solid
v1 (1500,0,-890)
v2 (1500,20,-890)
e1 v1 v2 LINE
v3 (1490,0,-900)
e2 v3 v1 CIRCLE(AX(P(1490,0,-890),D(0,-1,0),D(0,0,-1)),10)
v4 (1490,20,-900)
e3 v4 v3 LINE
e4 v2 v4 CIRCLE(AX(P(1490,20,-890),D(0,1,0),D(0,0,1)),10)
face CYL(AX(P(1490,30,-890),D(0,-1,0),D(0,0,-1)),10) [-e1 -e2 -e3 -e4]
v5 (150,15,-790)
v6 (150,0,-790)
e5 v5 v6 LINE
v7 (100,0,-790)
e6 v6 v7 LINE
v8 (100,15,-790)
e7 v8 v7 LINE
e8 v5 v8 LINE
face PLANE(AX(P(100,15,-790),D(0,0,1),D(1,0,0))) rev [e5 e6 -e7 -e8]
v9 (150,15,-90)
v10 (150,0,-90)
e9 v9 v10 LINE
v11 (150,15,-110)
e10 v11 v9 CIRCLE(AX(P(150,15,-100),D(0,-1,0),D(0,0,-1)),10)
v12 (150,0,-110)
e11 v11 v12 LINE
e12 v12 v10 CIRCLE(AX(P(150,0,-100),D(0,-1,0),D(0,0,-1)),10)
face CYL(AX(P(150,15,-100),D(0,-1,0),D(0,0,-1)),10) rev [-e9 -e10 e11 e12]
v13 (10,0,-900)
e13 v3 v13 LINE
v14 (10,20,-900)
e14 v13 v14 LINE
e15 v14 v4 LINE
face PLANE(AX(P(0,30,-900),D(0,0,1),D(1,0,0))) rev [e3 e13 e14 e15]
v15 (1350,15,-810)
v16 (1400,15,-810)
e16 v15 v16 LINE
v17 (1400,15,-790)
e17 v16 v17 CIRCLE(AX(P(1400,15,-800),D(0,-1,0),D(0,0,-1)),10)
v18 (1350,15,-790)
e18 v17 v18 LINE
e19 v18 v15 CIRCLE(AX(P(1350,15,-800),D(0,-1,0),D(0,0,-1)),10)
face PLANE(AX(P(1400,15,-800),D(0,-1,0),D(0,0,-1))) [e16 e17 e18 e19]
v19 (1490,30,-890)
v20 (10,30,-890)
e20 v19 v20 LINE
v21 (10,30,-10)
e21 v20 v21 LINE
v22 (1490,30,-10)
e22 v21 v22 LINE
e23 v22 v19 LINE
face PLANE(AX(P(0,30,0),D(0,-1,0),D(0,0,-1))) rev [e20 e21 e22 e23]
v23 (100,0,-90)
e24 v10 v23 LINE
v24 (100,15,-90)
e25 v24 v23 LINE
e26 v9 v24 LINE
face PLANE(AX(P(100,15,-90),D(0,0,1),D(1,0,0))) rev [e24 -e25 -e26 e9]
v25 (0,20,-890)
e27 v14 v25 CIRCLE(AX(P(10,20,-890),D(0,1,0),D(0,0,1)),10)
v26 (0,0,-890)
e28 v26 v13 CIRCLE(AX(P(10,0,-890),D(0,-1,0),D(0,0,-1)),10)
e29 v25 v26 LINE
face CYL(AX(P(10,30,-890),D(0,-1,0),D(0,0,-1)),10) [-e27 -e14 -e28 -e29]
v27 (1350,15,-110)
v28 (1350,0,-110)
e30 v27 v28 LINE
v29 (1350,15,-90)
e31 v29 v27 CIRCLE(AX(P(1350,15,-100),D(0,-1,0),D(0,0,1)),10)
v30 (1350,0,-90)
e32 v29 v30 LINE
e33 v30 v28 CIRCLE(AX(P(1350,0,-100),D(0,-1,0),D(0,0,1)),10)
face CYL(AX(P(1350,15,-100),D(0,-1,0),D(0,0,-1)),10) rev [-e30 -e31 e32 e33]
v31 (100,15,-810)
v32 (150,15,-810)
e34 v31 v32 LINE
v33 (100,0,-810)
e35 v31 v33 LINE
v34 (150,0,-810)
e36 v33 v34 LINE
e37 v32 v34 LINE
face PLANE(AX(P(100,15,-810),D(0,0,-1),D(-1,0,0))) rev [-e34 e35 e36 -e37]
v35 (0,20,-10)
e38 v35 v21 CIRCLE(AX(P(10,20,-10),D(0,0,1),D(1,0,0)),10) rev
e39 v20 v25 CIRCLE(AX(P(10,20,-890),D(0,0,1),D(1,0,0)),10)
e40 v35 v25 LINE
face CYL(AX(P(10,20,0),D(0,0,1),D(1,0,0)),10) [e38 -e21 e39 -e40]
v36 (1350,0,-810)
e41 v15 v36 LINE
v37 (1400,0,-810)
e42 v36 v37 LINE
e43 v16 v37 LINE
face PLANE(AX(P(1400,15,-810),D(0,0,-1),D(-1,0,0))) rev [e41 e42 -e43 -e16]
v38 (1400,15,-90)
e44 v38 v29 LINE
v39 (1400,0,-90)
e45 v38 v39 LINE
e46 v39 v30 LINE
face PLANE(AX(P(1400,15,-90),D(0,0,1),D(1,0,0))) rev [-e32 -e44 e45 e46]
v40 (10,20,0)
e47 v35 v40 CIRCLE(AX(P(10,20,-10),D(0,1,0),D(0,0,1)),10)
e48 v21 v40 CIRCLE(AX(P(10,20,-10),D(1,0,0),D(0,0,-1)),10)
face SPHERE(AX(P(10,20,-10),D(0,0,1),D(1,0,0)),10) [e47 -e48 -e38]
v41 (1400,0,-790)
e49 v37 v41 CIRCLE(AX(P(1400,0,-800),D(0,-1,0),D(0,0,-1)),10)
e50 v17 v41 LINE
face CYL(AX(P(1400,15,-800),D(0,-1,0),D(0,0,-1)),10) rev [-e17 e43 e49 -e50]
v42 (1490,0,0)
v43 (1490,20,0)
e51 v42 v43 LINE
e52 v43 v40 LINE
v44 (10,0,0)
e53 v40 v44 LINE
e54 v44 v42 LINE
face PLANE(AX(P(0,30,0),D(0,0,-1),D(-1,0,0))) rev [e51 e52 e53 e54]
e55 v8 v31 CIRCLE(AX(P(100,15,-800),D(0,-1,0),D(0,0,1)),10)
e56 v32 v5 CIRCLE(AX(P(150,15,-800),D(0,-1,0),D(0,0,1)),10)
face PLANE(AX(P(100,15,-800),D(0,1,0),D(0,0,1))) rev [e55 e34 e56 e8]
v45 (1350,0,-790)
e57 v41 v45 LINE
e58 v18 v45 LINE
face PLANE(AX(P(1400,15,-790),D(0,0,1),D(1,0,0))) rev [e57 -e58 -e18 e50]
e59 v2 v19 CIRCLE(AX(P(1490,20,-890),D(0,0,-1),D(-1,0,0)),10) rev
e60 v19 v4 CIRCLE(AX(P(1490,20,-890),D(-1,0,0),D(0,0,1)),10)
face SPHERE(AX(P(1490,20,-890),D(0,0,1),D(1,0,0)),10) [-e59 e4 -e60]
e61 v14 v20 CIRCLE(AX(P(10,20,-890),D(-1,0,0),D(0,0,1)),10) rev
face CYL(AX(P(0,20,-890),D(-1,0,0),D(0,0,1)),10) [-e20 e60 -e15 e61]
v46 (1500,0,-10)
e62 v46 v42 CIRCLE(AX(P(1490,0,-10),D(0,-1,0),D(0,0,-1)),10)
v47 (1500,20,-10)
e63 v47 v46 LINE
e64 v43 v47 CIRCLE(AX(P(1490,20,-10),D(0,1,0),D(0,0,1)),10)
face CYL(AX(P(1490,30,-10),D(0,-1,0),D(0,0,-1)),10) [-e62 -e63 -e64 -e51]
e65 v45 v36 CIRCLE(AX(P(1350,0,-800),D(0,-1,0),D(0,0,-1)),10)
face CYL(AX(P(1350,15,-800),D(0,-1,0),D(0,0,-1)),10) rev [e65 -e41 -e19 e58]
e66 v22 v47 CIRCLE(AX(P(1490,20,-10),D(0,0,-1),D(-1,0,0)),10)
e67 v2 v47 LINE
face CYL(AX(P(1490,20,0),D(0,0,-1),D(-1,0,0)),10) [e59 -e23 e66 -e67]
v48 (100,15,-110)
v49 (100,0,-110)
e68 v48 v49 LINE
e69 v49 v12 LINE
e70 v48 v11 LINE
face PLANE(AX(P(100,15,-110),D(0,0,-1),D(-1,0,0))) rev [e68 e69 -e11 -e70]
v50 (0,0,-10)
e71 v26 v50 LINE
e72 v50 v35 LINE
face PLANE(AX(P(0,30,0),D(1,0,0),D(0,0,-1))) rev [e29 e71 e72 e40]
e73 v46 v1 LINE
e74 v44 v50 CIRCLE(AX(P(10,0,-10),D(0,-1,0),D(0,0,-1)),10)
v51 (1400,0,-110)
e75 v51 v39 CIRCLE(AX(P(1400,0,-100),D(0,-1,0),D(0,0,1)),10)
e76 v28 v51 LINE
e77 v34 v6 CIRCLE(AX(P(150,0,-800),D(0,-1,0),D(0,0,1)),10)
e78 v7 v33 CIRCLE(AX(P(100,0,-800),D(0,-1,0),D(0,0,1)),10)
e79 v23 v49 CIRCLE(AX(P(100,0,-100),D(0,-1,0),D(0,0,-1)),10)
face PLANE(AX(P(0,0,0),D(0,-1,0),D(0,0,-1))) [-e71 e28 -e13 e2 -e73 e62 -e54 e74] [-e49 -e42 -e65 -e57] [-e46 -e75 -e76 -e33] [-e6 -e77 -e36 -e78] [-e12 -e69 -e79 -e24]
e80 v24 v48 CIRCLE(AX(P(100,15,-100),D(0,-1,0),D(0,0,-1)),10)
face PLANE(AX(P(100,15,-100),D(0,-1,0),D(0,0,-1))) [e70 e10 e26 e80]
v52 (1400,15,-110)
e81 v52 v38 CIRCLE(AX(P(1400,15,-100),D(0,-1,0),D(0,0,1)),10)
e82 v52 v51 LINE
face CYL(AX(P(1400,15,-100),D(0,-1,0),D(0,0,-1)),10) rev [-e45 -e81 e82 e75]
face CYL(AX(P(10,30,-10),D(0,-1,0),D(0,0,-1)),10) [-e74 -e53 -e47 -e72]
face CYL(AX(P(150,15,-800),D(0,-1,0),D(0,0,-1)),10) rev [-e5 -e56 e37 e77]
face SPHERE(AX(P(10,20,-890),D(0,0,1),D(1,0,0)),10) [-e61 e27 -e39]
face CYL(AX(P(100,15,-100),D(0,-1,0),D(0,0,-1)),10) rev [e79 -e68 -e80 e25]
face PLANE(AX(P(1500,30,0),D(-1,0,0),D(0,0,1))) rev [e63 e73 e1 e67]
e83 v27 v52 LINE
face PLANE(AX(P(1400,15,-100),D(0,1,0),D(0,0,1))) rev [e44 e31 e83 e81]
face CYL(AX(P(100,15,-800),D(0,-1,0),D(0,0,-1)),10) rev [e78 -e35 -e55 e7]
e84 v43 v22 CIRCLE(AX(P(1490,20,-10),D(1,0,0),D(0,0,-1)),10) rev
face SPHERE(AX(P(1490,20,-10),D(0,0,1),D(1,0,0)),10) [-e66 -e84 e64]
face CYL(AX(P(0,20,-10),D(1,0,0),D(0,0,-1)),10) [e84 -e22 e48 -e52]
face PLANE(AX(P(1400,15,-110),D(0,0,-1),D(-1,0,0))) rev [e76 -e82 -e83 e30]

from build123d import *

# Parameters (mm, degrees)
ESQUISSE1_W             = 1500
ESQUISSE1_H             = 900
BOSS_EXTRU_1_DEPTH      = 30
CONG_1_R                = 10
CONG_2_R                = 10
ENL_V_MAT_EXTRU_1_DEPTH = 15


with BuildPart() as part:
    # Esquisse1 → Boss.-Extru.1 (new body)
    with BuildSketch(Plane(origin=(0, 0, 0), x_dir=(1, 0, 0), z_dir=(0, 1, 0))):
        with Locations((750, 450)):
            Rectangle(ESQUISSE1_W, ESQUISSE1_H)
    extrude(amount=BOSS_EXTRU_1_DEPTH)

    # Congé1
    cong_1_edges = [part.edges().sort_by_distance(p)[0] for p in [
        (1500, 30, -450),
        (750, 30, -900),
        (0, 30, -450),
        (750, 30, 0),
    ]]
    fillet(cong_1_edges, radius=CONG_1_R)

    # Congé2
    # the kernel refuses this fillet: 10 mm, written as the material it takes off along each edge
    with BuildSketch(Plane(origin=(1490, 20, -10), x_dir=(1, 0, 0), z_dir=(0, 0, 1))) as cong_2_piece_1_section:
        Polygon((0, 0), (CONG_2_R * 1.02, 0), (CONG_2_R * 1.02, CONG_2_R * 1.02), (0, CONG_2_R * 1.02), align=None)
    cong_2_piece_1 = extrude(amount=CONG_2_R * 1.02, mode=Mode.PRIVATE)
    cong_2_piece_1 = cong_2_piece_1 - Plane(origin=(1490, 20, -10), x_dir=(-0.7071067811865475, -0.7071067811865475, 0), z_dir=(0, 0, 1)) * Sphere(CONG_2_R, mode=Mode.PRIVATE)
    add(cong_2_piece_1, mode=Mode.SUBTRACT)
    with BuildSketch(Plane(origin=(10, 20, -10), x_dir=(-1, 0, 0), z_dir=(0, 0, 1))) as cong_2_piece_2_section:
        Polygon((0, 0), (CONG_2_R * 1.02, 0), (CONG_2_R * 1.02, -CONG_2_R * 1.02), (0, -CONG_2_R * 1.02), align=None)
    cong_2_piece_2 = extrude(amount=CONG_2_R * 1.02, mode=Mode.PRIVATE)
    cong_2_piece_2 = cong_2_piece_2 - Plane(origin=(10, 20, -10), x_dir=(0.7071067811865475, -0.7071067811865475, 0), z_dir=(0, 0, 1)) * Sphere(CONG_2_R, mode=Mode.PRIVATE)
    add(cong_2_piece_2, mode=Mode.SUBTRACT)
    with BuildSketch(Plane(origin=(1490, 20, -890), x_dir=(0, 0, -1), z_dir=(1, 0, 0))) as cong_2_piece_3_section:
        Polygon((0, 0), (CONG_2_R * 1.02, 0), (CONG_2_R * 1.02, CONG_2_R * 1.02), (0, CONG_2_R * 1.02), align=None)
    cong_2_piece_3 = extrude(amount=CONG_2_R * 1.02, mode=Mode.PRIVATE)
    cong_2_piece_3 = cong_2_piece_3 - Plane(origin=(1490, 20, -890), x_dir=(0, -0.7071067811865475, 0.7071067811865475), z_dir=(1, 0, 0)) * Sphere(CONG_2_R, mode=Mode.PRIVATE)
    add(cong_2_piece_3, mode=Mode.SUBTRACT)
    with BuildSketch(Plane(origin=(10, 20, -890), x_dir=(0, 0, -1), z_dir=(-1, 0, 0))) as cong_2_piece_4_section:
        Polygon((0, 0), (CONG_2_R * 1.02, 0), (CONG_2_R * 1.02, -CONG_2_R * 1.02), (0, -CONG_2_R * 1.02), align=None)
    cong_2_piece_4 = extrude(amount=CONG_2_R * 1.02, mode=Mode.PRIVATE)
    cong_2_piece_4 = cong_2_piece_4 - Plane(origin=(10, 20, -890), x_dir=(0, -0.7071067811865475, 0.7071067811865475), z_dir=(-1, 0, 0)) * Sphere(CONG_2_R, mode=Mode.PRIVATE)
    add(cong_2_piece_4, mode=Mode.SUBTRACT)
    with BuildSketch(Plane(origin=(0, -25, -900), x_dir=(0, 0, 1), z_dir=(0, 1, 0)), Plane(origin=(0, -25, 0), x_dir=(1, 0, 0), z_dir=(0, 1, 0))) as cong_2_piece_5:
        with BuildLine():
            CenterArc((CONG_2_R, CONG_2_R), CONG_2_R, 180, 90)
            Line((0, CONG_2_R), (0, 0))
            Line((0, 0), (CONG_2_R, 0))
        make_face()
    extrude(amount=45, mode=Mode.SUBTRACT)
    with BuildSketch(Plane(origin=(1500, -25, -900), x_dir=(0, 0, 1), z_dir=(0, 1, 0)), Plane(origin=(1500, -25, 0), x_dir=(-1, 0, 0), z_dir=(0, 1, 0))) as cong_2_piece_6:
        with BuildLine():
            CenterArc((CONG_2_R, -CONG_2_R), CONG_2_R, 90, 90)
            Line((0, -CONG_2_R), (0, 0))
            Line((0, 0), (CONG_2_R, 0))
        make_face()
    extrude(amount=45, mode=Mode.SUBTRACT)

    # Esquisse2 → Enlèv. mat.-Extru.1 (cut)
    with BuildSketch(Plane.XZ):
        with BuildLine():
            Line((100, -90), (150, -90))
            ThreePointArc((150, -90), (160, -100), (150, -110))
            Line((150, -110), (100, -110))
            ThreePointArc((100, -110), (90, -100), (100, -90))
        make_face()
        with BuildLine():
            Line((1400, -90), (1350, -90))
            ThreePointArc((1350, -90), (1340, -100), (1350, -110))
            Line((1350, -110), (1400, -110))
            ThreePointArc((1400, -110), (1410, -100), (1400, -90))
        make_face()
        with BuildLine():
            Line((1400, -810), (1350, -810))
            ThreePointArc((1350, -810), (1340, -800), (1350, -790))
            Line((1350, -790), (1400, -790))
            ThreePointArc((1400, -790), (1410, -800), (1400, -810))
        make_face()
        with BuildLine():
            Line((100, -810), (150, -810))
            ThreePointArc((150, -810), (160, -800), (150, -790))
            Line((150, -790), (100, -790))
            ThreePointArc((100, -790), (90, -800), (100, -810))
        make_face()
    extrude(amount=-ENL_V_MAT_EXTRU_1_DEPTH, mode=Mode.SUBTRACT)


solid = part.part
